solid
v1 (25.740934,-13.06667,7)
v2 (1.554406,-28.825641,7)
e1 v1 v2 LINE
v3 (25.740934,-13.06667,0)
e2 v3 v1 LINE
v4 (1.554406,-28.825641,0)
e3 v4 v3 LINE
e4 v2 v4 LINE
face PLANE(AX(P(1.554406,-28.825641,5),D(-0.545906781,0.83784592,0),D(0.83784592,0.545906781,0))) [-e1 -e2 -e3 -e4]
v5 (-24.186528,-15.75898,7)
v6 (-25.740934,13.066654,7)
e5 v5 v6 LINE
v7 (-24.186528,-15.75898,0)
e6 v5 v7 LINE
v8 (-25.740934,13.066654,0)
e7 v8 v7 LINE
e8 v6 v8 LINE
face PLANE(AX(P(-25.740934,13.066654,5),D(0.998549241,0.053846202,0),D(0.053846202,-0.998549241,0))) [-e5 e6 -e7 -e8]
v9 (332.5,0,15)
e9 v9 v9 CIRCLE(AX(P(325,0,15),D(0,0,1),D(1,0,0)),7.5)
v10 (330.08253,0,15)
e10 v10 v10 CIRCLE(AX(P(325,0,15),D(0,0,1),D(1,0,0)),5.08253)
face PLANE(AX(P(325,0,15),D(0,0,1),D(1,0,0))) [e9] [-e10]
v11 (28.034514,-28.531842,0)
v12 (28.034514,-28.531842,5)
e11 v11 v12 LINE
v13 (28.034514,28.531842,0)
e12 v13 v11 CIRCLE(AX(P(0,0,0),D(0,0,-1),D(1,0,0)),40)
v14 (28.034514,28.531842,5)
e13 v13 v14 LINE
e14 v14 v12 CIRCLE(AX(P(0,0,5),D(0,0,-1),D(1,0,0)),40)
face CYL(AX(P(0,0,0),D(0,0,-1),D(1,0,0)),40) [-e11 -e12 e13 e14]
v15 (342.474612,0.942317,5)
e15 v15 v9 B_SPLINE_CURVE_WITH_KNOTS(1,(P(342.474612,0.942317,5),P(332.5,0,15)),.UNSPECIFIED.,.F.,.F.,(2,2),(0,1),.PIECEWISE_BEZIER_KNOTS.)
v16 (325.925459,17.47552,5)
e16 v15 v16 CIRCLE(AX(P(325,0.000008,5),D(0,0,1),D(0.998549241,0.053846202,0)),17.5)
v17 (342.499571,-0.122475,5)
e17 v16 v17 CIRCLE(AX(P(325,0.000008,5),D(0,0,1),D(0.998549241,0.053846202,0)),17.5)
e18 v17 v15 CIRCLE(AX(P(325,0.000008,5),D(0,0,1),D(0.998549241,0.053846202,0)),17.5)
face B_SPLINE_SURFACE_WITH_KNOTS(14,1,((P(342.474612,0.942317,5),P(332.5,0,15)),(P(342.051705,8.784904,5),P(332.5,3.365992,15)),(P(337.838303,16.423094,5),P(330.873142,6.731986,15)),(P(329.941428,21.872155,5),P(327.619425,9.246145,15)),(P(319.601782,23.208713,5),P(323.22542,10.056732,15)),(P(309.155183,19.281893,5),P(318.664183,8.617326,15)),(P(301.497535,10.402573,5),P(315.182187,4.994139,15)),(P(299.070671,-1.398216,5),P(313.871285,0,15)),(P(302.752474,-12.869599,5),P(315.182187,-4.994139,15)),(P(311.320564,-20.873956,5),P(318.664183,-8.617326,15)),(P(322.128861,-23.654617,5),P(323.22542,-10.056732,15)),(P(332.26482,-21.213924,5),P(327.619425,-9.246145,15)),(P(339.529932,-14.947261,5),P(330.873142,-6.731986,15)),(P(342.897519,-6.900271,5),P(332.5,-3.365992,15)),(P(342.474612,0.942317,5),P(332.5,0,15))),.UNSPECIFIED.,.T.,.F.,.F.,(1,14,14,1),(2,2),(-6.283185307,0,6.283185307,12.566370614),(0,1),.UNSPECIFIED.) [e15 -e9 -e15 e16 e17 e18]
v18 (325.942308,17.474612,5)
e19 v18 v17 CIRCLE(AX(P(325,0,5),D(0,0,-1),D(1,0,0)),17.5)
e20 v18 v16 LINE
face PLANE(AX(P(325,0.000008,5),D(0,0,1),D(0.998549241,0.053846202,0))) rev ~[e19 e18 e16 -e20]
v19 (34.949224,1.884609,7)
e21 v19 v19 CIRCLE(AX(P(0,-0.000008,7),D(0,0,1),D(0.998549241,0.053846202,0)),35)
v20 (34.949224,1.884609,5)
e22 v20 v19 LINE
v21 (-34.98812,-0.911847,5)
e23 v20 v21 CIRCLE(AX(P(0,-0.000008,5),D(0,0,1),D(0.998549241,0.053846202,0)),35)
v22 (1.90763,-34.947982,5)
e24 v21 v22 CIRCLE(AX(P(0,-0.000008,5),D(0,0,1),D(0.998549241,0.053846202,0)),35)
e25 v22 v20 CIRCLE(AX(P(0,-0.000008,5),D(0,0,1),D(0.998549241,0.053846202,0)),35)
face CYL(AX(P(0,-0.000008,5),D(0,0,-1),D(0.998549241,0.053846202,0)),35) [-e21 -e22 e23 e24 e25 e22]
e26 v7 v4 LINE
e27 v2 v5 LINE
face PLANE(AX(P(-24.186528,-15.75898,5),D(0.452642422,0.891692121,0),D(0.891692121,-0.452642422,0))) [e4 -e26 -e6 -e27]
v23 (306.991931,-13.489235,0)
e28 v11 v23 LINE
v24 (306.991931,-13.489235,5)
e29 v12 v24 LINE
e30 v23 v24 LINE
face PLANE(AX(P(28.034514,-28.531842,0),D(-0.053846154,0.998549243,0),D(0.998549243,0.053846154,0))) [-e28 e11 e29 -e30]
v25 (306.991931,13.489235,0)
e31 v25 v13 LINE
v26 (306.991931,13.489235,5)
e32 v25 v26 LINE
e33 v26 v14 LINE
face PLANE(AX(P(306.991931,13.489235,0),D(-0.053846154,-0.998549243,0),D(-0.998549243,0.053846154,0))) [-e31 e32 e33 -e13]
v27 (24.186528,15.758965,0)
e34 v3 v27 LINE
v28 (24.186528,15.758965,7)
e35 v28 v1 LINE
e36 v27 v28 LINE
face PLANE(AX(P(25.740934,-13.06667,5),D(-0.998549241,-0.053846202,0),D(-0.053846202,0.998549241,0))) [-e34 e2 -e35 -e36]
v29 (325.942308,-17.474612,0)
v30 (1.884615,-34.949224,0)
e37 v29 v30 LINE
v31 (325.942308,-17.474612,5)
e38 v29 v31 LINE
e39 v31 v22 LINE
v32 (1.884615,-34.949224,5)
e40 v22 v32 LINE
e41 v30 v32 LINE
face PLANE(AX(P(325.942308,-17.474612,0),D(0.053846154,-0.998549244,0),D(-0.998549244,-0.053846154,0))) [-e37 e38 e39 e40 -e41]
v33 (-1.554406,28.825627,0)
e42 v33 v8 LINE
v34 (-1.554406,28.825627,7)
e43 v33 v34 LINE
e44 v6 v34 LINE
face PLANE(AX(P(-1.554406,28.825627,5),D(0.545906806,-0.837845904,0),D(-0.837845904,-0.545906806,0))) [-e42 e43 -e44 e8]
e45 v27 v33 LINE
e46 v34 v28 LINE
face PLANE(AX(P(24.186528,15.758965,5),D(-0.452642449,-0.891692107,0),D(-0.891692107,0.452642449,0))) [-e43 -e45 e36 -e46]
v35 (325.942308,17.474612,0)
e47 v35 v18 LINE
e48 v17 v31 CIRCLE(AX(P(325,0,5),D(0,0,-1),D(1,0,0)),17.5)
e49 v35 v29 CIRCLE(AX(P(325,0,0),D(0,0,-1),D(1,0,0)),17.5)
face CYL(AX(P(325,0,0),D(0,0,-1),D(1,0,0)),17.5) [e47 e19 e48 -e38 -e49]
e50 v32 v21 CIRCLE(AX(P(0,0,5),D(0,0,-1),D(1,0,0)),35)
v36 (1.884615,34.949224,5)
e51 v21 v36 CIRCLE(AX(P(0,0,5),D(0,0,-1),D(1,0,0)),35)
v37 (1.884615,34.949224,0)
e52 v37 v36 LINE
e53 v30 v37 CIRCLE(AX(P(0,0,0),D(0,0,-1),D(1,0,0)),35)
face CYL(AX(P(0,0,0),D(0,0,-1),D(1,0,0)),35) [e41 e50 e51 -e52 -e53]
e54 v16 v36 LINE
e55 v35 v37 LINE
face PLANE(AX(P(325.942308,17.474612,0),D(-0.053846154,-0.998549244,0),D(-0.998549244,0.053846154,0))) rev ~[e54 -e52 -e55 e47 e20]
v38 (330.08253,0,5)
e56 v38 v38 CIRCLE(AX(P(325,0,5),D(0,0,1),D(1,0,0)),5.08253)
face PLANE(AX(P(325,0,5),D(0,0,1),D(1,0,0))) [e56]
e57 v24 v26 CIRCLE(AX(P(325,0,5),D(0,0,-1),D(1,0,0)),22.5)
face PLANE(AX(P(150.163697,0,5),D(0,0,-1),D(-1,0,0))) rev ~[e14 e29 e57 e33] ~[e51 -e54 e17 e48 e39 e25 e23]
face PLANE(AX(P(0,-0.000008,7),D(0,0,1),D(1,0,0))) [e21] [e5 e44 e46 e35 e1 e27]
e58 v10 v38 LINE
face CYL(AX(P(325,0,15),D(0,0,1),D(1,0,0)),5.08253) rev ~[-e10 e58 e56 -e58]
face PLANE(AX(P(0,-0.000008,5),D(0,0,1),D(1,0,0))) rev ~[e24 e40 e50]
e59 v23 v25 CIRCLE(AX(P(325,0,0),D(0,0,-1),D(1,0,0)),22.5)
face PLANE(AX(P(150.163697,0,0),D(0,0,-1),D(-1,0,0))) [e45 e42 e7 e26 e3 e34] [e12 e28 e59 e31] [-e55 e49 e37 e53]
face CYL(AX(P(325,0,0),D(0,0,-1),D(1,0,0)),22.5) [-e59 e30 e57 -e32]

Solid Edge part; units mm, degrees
sketch "Sketch1" plane through (0, 0, 0) normal (0, 0, 1) x (1, 0, 0)
  line L0 (325.942308, -17.474612) -> (1.884615, -34.949224)
  line L1 (325.942308, 17.474612) -> (1.884615, 34.949224)
  arc A0 (1.884601, -34.949224) -> (1.884601, 34.949224) centre (0, 0) cw
  arc A1 (325.942301, 17.474612) -> (325.942301, -17.474612) centre (325, 0) cw
extrude "Protrusion1" add sketch "Sketch1" along normal blind 5
sketch "Sketch2" plane through (153.75, 0, 5) normal (0, 0, 1) x (0.9985492, 0.0538462, 0)
  circle A0 centre (-153.526946, 8.278846) radius 35
extrude "ExtrudedProtrusion_5" add sketch "Sketch2" along normal blind 2
sketch "Sketch3" plane through (153.75, 0, 5) normal (0, 0, 1) x (0.9985492, 0.0538462, 0)
  circle A0 centre (171.001558, -9.221154) radius 17.5
sketch "Sketch4" plane through (0, 0, 15) normal (0, 0, 1) x (1, 0, 0)
  circle A0 centre (325, 0) radius 7.5
loft "LoftedProtrusion1" add profiles "Sketch3", "Sketch4"
sketch "Sketch5" plane through (0, 0, 0) normal (0, 0, 1) x (1, 0, 0)
  line L0 (28.034514, -28.531842) -> (306.991931, -13.489235)
  line L1 (306.991931, 13.489235) -> (28.034514, 28.531842)
  arc A0 (28.034528, 28.531829) -> (28.034528, -28.531829) centre (0, 0) cw
  arc A1 (306.991903, -13.489198) -> (306.991903, 13.489198) centre (325, 0) cw
extrude "ExtrudedCutout_8" cut sketch "Sketch5" along normal blind 76.110671
sketch "Sketch6" plane through (153.75, 0, 5) normal (0, 0, 1) x (0.9985492, 0.0538462, 0)
  line L0 (-153.526946, -20.588667) -> (-128.526946, -6.154911)
  line L1 (-128.526946, -6.154911) -> (-128.526946, 22.712603)
  line L2 (-128.526946, 22.712603) -> (-153.526946, 37.14636)
  line L3 (-153.526946, 37.14636) -> (-178.526946, 22.712603)
  line L4 (-178.526946, 22.712603) -> (-178.526946, -6.154911)
  line L5 (-178.526946, -6.154911) -> (-153.526946, -20.588667)
extrude "ExtrudedCutout_9" cut sketch "Sketch6" along normal mid plane 58.160564
sketch "Sketch7" plane through (0, 0, 15) normal (0, 0, 1) x (1, 0, 0)
  circle A0 centre (325, 0) radius 5.08253
extrude "ExtrudedCutout_10" cut sketch "Sketch7" against normal blind 10
